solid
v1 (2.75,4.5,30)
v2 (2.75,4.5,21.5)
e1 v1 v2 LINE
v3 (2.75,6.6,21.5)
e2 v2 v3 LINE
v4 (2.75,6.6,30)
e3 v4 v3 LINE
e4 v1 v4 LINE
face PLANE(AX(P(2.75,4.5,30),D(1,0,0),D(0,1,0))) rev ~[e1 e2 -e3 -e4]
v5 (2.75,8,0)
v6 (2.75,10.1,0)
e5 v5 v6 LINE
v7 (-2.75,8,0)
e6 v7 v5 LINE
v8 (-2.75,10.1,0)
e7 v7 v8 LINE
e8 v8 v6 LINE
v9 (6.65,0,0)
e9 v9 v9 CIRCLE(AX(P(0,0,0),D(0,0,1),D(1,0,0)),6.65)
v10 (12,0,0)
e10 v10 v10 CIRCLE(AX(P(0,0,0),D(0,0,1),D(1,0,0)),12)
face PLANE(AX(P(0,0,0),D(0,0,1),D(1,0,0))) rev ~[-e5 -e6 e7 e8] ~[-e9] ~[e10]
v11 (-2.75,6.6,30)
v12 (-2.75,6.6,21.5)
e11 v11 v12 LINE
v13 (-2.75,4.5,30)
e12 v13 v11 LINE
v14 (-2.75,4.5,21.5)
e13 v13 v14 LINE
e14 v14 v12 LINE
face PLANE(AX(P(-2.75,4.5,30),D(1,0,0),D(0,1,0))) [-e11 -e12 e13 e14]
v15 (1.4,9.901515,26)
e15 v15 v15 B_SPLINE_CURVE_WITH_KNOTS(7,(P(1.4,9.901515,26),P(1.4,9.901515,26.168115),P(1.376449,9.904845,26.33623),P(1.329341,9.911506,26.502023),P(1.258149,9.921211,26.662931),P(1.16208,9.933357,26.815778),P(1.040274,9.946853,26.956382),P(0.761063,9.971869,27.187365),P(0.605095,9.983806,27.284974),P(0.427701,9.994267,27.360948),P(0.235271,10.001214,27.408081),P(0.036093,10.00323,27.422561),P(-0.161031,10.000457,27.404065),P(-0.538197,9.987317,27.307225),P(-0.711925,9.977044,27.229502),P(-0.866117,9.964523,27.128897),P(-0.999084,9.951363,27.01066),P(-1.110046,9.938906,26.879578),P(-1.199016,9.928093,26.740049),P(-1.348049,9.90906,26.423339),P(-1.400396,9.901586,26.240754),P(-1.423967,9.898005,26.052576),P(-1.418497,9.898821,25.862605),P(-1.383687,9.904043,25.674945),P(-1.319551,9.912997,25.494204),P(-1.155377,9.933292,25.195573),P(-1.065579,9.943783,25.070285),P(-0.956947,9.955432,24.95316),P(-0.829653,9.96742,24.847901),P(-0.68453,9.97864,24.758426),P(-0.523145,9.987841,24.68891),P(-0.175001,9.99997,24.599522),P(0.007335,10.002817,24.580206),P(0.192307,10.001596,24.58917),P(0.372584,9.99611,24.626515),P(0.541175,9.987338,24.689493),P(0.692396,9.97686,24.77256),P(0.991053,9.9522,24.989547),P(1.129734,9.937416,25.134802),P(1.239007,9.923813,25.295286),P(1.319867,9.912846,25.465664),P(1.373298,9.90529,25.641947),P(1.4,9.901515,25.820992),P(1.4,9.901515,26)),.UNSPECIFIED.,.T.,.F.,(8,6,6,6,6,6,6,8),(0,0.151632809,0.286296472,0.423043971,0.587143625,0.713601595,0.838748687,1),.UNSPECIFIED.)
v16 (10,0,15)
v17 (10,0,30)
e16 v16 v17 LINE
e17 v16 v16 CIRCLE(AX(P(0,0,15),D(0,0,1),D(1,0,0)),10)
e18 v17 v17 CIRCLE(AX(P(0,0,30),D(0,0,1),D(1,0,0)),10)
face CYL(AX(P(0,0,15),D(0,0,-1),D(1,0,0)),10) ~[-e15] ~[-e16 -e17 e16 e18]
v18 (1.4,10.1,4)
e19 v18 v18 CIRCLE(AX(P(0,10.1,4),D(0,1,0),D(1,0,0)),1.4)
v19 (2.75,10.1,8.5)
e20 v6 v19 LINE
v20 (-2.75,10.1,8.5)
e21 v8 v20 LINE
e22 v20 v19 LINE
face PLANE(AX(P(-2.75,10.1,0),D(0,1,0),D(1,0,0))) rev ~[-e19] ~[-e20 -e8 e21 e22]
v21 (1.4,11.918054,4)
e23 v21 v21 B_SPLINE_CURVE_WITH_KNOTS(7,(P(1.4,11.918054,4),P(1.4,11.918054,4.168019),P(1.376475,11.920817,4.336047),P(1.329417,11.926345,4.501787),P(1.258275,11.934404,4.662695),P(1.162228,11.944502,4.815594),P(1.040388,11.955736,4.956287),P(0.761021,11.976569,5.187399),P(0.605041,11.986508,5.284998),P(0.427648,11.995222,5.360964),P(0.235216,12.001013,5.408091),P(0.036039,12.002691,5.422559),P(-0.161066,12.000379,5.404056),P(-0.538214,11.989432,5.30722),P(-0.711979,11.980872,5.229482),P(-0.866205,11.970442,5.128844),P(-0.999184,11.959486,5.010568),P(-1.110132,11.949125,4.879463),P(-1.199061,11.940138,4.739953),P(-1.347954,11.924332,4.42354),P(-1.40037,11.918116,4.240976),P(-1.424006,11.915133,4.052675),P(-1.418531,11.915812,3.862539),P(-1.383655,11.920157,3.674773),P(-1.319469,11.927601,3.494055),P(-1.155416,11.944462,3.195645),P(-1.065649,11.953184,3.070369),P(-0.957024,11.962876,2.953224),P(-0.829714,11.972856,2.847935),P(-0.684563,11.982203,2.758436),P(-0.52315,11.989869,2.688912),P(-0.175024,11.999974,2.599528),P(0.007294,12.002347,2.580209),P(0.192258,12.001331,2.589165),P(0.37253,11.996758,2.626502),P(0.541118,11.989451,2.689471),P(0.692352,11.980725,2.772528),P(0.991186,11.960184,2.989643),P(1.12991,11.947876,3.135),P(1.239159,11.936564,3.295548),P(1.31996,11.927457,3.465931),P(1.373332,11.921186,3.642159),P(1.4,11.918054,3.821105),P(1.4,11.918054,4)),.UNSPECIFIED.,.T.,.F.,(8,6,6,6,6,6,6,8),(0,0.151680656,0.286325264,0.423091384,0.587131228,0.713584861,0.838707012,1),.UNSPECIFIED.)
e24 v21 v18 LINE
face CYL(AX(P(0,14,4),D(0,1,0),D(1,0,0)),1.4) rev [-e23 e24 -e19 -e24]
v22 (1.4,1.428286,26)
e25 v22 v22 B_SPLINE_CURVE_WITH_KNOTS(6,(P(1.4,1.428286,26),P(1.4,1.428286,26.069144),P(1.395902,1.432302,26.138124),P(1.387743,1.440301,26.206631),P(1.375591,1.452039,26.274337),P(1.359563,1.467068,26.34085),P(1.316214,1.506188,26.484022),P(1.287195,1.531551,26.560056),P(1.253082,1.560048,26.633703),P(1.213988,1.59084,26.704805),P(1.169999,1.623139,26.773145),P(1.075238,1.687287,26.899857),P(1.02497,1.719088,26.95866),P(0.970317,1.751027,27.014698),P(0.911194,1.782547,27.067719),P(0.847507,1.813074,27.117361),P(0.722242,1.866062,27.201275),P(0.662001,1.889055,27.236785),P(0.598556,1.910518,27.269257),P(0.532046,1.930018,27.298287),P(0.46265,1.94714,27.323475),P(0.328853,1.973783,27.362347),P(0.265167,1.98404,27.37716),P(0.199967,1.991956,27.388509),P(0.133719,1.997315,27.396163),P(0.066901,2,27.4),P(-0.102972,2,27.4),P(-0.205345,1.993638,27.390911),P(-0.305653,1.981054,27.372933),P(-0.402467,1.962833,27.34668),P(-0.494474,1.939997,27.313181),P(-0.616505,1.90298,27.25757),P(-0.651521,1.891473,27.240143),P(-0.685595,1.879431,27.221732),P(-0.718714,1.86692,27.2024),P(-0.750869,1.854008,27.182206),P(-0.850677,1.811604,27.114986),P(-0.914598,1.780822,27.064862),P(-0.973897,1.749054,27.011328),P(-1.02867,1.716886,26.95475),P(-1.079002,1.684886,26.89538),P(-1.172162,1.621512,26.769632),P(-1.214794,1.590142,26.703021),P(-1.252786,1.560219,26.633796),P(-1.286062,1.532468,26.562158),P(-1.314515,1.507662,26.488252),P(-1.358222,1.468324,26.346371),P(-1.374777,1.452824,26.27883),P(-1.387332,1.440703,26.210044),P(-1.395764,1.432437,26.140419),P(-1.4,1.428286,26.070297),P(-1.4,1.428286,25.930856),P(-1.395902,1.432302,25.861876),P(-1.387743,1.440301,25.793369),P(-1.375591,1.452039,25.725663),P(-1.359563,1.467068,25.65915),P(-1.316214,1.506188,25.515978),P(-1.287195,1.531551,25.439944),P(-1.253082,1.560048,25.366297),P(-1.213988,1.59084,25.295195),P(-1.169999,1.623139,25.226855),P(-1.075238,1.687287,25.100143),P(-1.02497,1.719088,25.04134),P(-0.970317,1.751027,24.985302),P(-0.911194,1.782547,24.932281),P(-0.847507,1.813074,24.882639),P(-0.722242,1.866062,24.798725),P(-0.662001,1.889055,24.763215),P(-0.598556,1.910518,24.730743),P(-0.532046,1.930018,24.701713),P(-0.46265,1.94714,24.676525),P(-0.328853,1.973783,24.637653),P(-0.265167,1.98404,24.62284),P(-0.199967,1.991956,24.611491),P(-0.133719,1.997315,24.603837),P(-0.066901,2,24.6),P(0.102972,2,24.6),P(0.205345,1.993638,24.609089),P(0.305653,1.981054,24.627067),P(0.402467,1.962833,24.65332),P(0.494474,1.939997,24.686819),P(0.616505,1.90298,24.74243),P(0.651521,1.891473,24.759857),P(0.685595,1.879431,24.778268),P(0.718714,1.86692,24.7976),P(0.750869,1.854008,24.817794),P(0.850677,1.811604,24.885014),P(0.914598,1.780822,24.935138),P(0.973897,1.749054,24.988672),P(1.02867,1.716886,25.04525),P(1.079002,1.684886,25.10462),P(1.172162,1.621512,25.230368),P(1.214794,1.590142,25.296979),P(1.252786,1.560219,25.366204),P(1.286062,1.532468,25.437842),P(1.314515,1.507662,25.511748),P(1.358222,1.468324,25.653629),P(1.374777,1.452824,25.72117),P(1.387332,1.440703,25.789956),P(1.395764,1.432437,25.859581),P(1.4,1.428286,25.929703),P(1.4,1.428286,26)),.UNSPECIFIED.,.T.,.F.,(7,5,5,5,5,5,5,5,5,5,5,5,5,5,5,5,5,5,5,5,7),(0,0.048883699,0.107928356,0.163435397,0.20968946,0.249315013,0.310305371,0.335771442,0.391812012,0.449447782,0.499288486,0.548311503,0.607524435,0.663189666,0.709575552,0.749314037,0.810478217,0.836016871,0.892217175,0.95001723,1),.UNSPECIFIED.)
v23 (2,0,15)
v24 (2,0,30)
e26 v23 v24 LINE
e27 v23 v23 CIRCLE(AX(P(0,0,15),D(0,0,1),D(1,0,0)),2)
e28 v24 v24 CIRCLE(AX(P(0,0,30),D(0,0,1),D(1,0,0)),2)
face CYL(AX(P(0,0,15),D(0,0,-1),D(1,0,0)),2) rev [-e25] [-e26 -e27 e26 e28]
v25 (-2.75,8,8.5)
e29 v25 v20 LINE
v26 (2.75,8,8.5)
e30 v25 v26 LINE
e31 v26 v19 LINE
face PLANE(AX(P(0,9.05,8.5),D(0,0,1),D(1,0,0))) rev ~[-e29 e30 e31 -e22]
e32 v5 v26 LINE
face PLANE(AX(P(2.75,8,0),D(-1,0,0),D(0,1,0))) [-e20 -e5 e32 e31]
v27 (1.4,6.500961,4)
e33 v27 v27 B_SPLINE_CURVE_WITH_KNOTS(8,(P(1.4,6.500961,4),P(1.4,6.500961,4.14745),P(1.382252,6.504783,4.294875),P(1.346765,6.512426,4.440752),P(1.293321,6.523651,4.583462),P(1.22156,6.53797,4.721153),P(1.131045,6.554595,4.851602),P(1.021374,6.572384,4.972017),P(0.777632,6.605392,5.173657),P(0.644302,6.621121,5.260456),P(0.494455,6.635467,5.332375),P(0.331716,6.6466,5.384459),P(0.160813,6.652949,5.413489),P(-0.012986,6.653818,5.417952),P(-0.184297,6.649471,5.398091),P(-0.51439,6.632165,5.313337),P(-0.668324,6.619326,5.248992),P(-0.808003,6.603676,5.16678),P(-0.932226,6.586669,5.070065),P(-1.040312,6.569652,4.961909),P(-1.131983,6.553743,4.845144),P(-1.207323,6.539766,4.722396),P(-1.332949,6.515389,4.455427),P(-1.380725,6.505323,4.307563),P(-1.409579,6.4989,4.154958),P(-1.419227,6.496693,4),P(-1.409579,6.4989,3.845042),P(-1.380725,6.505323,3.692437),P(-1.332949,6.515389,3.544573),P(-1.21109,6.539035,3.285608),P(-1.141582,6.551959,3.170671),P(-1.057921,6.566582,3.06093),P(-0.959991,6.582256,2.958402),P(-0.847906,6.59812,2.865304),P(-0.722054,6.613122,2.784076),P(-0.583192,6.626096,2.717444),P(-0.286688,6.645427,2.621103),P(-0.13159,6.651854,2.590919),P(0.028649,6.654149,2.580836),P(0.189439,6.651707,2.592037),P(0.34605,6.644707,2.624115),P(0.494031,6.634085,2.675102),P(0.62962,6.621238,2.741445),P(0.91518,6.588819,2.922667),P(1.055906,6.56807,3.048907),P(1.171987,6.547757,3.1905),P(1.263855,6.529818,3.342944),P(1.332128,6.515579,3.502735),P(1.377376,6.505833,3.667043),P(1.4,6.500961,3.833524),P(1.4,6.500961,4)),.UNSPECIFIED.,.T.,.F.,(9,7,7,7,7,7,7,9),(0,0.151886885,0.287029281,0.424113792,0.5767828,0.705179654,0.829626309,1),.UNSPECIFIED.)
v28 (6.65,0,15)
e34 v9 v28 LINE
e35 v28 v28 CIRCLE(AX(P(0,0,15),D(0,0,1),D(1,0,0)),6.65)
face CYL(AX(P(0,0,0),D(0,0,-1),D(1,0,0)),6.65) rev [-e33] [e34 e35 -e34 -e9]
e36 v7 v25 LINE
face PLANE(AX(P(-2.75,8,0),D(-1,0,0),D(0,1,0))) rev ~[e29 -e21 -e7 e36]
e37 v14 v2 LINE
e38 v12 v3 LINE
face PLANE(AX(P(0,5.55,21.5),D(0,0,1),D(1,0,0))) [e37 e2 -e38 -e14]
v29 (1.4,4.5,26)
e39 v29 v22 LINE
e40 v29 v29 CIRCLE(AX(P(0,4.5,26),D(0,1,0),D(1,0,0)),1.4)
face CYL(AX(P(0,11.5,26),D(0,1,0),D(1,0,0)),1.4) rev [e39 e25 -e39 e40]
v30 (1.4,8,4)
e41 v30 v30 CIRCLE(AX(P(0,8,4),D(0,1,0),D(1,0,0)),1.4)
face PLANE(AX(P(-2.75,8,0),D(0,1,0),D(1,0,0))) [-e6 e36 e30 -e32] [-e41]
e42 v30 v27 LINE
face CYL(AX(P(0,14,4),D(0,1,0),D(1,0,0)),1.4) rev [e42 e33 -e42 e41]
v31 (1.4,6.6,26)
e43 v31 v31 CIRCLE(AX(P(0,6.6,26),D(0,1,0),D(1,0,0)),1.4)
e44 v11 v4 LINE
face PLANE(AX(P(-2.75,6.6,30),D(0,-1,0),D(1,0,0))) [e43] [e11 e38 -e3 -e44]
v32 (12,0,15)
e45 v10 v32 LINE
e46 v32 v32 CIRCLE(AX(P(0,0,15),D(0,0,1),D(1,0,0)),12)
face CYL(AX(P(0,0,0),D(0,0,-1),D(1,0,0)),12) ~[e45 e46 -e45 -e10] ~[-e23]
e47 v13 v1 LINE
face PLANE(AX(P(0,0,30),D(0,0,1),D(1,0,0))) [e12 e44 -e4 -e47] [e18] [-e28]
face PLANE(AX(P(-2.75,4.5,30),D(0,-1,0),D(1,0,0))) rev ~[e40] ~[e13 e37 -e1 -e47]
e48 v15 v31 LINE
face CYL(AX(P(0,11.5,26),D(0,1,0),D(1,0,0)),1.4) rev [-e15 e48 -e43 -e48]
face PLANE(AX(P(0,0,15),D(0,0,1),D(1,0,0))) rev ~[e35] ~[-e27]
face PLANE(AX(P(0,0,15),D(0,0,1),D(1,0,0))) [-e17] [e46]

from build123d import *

# Parameters (mm, degrees)
F0_R      = 12
F0_R_2    = 6.65
F1_DEPTH  = 15
F3_R      = 1.4
F4_DEPTH  = 10
F5_R      = 10
F5_R_2    = 2
F6_DEPTH  = 15
F8_R      = 1.4
F9_DEPTH  = 11
F10_W     = 5.5
F10_H     = 2.1
F11_DEPTH = 8.5
F12_W     = 5.5
F12_H     = 2.1
F13_DEPTH = 8.5


# Not quite as in the source:
# - a feature names something its author has since deleted; it is built from what else it names


with BuildPart() as f1:
    # F0 (on Top) → F1 (new body)
    with BuildSketch(Plane.XY):
        Circle(F0_R)
        Circle(F0_R_2, mode=Mode.SUBTRACT)
    extrude(amount=F1_DEPTH)

    # F3 (on offset) → F4 (cut)
    with BuildSketch(Plane.XZ.offset(-14)):
        with Locations((0, 4)):
            Circle(F3_R)
    extrude(amount=F4_DEPTH, mode=Mode.SUBTRACT)

    # F5 (on face) → F6 (join)
    with BuildSketch(Plane.XY.offset(15)):
        Circle(F5_R)
        Circle(F5_R_2, mode=Mode.SUBTRACT)
    extrude(amount=F6_DEPTH)

    # F8 (on offset) → F9 (cut)
    with BuildSketch(Plane.XZ.offset(-11.5)):
        with Locations((0, 26)):
            Circle(F8_R)
    extrude(amount=F9_DEPTH, mode=Mode.SUBTRACT)

    # F10 (on face) → F11 (cut)
    with BuildSketch(Plane.XY.offset(30)):
        with Locations((0, 5.55)):
            Rectangle(F10_W, F10_H)
    extrude(amount=-F11_DEPTH, mode=Mode.SUBTRACT)

    # F12 (on face) → F13 (cut)
    with BuildSketch(Plane.XY):
        with Locations((0, 9.05)):
            Rectangle(F12_W, F12_H)
    extrude(amount=F13_DEPTH, mode=Mode.SUBTRACT)


solid = f1.part
